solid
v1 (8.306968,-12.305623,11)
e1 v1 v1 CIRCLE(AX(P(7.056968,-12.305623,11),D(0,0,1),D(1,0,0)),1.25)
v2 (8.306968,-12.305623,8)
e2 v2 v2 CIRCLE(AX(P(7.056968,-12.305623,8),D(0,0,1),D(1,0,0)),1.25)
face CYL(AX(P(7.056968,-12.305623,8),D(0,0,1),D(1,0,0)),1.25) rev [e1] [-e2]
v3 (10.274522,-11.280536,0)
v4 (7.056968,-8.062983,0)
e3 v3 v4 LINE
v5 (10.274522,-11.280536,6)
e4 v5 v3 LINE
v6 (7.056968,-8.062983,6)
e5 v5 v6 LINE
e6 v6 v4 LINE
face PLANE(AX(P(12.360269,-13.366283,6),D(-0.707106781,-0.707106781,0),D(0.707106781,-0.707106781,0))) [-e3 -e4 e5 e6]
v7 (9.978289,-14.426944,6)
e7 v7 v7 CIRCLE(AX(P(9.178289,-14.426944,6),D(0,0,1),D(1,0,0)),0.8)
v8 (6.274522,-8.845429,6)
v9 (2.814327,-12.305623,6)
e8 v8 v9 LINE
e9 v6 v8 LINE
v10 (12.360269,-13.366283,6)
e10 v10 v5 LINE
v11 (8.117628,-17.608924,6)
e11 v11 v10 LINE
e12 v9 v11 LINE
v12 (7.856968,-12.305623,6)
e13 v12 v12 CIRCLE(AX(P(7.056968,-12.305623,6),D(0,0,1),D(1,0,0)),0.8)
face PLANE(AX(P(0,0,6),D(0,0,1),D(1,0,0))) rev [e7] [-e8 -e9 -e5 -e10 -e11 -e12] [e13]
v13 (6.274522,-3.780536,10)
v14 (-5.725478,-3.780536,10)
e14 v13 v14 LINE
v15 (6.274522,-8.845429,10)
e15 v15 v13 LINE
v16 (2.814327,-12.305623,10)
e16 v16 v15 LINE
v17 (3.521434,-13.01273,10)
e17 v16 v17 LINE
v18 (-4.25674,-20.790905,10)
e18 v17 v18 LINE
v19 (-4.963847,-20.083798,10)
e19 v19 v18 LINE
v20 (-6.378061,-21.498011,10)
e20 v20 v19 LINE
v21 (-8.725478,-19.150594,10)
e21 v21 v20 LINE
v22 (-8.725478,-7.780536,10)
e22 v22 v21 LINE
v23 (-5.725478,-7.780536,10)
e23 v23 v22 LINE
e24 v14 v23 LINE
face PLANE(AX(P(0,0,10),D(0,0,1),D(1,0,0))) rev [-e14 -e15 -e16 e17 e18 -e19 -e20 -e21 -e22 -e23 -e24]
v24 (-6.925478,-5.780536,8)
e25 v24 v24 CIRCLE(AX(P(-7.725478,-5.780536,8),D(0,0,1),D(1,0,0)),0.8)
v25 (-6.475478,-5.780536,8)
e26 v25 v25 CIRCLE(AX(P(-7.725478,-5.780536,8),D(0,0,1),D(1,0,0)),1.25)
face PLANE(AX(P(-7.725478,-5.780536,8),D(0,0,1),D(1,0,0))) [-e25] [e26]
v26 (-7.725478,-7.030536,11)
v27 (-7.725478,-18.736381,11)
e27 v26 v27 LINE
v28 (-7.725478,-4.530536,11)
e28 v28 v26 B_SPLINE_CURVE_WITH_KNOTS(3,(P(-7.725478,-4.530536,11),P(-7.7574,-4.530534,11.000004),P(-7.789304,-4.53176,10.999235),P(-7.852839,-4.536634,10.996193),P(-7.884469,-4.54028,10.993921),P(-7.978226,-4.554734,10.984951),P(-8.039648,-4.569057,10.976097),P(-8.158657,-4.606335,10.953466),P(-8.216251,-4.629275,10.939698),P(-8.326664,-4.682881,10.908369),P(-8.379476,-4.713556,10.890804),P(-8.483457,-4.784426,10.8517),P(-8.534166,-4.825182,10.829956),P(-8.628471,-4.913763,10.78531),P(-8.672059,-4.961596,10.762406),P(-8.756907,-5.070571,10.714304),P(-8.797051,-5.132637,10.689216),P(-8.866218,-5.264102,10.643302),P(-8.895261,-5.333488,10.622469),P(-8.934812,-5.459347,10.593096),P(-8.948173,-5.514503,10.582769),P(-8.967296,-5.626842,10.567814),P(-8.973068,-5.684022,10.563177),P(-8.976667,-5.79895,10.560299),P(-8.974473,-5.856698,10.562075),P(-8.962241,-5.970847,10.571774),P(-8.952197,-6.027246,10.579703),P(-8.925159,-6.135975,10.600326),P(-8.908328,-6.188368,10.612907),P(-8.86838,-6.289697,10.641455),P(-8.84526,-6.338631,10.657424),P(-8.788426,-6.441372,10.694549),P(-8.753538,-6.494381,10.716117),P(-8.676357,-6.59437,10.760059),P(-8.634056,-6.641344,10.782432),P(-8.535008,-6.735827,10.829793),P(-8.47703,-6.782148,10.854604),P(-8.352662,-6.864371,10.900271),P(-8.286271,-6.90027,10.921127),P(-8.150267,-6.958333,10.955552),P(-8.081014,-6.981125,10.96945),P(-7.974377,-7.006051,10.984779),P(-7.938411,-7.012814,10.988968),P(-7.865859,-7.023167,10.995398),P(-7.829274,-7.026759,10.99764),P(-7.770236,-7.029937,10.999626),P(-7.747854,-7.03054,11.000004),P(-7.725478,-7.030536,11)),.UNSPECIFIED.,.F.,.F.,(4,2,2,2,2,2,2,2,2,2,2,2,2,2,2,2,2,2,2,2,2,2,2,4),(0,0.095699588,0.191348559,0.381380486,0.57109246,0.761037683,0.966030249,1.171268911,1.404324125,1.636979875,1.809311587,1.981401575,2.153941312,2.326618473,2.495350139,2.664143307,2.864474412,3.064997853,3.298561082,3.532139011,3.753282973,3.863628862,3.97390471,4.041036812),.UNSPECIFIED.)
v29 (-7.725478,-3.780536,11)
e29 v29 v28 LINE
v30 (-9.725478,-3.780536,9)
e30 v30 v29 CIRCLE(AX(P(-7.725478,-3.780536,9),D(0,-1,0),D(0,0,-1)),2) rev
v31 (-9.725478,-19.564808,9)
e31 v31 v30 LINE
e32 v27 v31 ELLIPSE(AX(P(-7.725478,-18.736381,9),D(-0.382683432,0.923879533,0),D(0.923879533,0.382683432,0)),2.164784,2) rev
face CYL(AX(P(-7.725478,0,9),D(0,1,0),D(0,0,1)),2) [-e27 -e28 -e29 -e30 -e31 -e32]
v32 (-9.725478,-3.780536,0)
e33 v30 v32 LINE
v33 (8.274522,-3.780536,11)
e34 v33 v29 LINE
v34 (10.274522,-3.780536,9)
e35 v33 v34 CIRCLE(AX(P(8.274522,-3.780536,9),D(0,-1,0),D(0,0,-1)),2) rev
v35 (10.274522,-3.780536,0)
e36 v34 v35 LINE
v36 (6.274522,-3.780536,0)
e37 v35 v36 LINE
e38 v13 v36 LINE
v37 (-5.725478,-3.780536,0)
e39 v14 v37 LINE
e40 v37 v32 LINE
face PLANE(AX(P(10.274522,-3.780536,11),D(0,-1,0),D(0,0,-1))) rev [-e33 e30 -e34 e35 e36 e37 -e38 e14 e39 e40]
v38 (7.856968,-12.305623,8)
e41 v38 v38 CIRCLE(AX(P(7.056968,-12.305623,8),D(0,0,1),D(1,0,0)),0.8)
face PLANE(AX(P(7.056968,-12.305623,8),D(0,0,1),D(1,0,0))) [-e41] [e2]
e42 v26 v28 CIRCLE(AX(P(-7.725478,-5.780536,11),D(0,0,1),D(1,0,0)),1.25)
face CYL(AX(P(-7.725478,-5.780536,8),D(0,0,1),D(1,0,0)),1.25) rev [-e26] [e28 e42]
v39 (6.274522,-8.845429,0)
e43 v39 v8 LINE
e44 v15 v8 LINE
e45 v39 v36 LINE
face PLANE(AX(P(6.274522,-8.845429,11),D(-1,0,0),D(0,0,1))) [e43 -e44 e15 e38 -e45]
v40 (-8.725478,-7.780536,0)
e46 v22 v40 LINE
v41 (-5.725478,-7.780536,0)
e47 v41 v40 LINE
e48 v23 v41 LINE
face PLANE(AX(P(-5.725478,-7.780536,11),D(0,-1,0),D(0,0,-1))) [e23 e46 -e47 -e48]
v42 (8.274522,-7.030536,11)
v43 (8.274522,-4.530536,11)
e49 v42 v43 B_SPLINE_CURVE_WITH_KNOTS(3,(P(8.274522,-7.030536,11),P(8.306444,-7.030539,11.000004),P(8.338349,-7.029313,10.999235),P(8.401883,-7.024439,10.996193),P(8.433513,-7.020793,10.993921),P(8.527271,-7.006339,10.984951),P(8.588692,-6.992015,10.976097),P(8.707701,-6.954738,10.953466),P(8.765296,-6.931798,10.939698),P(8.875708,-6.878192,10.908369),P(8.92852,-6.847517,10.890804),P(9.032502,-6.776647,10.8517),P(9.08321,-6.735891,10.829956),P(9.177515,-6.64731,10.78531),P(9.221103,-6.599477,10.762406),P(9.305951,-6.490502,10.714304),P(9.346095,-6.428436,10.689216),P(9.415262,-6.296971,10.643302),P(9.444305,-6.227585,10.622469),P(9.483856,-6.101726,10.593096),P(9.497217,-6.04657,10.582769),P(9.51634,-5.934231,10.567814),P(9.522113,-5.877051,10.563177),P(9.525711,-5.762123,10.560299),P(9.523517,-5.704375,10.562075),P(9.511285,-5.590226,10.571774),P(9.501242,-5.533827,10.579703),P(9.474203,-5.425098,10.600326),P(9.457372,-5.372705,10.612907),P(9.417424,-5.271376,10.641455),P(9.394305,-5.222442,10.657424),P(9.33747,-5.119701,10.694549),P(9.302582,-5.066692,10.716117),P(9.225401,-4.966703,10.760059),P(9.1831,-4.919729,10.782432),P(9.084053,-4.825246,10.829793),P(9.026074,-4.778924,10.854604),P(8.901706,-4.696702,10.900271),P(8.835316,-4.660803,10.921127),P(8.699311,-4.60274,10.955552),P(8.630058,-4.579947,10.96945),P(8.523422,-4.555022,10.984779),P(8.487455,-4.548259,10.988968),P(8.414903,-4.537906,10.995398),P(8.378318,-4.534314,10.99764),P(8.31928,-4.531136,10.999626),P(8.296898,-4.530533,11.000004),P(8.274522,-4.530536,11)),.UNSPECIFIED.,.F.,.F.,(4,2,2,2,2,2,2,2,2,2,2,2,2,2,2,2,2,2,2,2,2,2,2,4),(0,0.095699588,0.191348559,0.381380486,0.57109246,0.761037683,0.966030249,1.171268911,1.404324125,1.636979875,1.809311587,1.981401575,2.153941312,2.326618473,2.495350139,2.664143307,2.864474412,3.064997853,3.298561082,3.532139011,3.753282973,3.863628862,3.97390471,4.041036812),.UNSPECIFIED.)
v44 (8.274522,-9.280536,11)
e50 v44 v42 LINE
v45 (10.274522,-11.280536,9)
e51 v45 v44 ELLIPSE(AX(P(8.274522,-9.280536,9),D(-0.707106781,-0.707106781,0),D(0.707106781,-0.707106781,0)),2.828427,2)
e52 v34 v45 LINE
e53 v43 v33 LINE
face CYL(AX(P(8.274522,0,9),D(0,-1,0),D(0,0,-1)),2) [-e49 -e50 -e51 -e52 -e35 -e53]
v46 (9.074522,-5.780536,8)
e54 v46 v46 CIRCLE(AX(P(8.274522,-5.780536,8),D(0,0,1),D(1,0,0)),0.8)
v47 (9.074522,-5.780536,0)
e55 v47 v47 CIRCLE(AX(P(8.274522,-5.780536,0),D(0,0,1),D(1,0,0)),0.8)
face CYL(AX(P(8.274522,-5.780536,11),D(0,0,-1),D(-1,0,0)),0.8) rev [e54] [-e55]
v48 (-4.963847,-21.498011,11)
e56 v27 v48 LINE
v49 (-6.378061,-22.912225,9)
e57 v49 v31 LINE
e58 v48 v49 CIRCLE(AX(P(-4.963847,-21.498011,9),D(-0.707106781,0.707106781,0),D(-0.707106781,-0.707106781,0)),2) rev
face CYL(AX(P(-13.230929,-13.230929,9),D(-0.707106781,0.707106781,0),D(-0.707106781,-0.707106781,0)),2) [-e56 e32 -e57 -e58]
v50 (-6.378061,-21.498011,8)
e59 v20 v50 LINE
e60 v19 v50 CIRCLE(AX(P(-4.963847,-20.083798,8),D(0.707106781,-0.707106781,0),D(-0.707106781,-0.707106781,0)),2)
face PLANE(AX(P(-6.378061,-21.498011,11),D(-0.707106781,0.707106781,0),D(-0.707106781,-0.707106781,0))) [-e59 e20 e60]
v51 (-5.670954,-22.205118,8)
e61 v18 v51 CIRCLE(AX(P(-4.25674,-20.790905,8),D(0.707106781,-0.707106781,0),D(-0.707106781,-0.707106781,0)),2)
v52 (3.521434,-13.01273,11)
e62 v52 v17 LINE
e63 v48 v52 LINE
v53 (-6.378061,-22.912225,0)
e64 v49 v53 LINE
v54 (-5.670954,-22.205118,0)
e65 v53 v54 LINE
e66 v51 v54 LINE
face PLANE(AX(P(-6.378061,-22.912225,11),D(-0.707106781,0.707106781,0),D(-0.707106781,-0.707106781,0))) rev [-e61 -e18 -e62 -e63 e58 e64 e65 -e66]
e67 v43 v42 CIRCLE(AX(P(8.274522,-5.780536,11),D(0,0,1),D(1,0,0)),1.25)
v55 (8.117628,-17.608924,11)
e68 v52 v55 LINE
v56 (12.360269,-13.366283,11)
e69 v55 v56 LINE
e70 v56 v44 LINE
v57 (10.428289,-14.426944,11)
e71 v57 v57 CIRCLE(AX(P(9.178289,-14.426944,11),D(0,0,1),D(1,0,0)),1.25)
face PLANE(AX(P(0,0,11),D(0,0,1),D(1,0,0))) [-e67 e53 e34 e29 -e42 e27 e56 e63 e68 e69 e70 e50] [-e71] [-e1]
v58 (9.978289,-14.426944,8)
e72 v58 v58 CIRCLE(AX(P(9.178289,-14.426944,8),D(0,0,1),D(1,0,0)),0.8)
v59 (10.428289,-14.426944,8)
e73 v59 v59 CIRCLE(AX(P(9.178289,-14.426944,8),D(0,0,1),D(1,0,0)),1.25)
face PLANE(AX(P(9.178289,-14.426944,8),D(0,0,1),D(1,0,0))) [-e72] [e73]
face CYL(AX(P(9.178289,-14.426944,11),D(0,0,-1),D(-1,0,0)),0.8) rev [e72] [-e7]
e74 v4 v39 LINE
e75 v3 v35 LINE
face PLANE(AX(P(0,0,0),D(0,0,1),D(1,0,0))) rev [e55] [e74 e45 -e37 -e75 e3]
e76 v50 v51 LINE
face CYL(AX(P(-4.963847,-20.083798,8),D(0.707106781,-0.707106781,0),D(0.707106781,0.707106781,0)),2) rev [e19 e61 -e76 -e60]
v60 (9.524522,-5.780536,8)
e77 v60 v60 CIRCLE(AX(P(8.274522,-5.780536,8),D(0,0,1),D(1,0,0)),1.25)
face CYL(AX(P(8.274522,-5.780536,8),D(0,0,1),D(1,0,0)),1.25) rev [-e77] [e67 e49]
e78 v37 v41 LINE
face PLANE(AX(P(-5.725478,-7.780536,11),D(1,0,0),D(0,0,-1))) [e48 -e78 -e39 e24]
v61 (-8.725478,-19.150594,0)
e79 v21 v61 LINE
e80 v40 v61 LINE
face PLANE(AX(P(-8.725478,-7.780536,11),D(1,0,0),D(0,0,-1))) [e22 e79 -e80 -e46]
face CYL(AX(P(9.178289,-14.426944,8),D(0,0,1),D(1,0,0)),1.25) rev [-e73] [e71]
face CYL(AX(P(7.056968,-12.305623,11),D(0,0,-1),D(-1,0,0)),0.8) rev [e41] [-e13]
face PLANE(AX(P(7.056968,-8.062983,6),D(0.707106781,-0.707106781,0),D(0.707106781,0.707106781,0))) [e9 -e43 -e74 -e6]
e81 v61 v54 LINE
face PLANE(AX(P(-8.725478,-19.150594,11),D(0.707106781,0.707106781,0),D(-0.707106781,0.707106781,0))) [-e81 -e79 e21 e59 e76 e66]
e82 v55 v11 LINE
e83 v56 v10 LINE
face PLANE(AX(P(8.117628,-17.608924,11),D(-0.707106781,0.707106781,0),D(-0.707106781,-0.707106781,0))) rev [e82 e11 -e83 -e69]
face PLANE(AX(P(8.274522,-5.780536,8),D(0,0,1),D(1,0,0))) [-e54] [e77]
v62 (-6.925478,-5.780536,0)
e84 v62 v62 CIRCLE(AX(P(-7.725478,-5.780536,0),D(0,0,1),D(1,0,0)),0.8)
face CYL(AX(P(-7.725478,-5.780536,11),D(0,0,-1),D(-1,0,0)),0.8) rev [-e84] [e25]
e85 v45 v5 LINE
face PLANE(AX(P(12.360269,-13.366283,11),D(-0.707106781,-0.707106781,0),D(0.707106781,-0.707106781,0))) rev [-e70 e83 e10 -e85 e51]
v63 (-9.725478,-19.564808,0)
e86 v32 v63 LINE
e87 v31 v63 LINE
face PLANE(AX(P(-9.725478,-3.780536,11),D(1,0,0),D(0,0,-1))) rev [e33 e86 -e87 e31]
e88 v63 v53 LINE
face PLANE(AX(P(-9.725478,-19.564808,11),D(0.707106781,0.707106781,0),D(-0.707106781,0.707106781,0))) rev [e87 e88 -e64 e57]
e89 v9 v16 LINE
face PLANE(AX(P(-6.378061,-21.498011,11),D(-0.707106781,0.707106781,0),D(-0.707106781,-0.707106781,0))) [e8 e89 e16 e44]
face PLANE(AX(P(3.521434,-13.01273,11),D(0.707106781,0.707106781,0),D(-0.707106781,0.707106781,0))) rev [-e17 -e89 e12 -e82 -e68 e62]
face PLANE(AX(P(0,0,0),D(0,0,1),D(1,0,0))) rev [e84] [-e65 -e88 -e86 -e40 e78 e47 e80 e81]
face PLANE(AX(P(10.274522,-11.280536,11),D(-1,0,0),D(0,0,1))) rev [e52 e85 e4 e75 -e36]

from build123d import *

# Parameters (mm, degrees)
BOSS_EXTRUDE1_DEPTH      = 11
BOSS_EXTRUDE2_START      = 11
BOSS_EXTRUDE2_DEPTH      = 1
SKETCH6_W                = 12
SKETCH6_H                = 1
UPPER_TUBE_OPENING_DEPTH = 10
LOWER_TUBE_OPENING_DEPTH = 1
SKETCH4_R                = 0.800000001
SKETCH4_R_2              = 0.800000002
SCREW_HOLES_DEPTH        = 29.262100116
SCREW_START              = 11
SKETCH5_R                = 1.25
SCREW_HEADS_DEPTH        = 3
FILLET1_R                = 2
CUT_EXTRUDE1_DEPTH       = 6


with BuildPart() as part:
    # Sketch2 → Boss-Extrude1 (new body)
    with BuildSketch(Plane.XY):
        Polygon((-6.378060684, -22.912224964), (3.521434253, -13.012730028), (8.11762833, -17.608924106), (12.360269017, -13.366283419), (10.274522062, -11.280536464), (10.274522062, -3.780536464), (-9.725477938, -3.780536464), (-9.725477938, -19.56480771), align=None)
        Polygon((-5.725477938, -7.780536464), (-5.725477938, -4.780536464), (6.274522063, -4.780536464), (6.274522063, -8.845428655), (-6.378060684, -21.498011402), (-8.725477938, -19.150594148), (-8.725477938, -7.780536464), align=None, mode=Mode.SUBTRACT)
    extrude(amount=BOSS_EXTRUDE1_DEPTH)

    # Sketch3 → Boss-Extrude2 (add)
    with BuildSketch(Plane.XY.offset(BOSS_EXTRUDE2_START)):
        Polygon((-6.378060684, -22.912224964), (3.521434253, -13.012730028), (8.11762833, -17.608924106), (12.360269017, -13.366283419), (10.274522062, -11.280536464), (10.274522062, -3.780536464), (-9.725477938, -3.780536464), (-9.725477938, -19.56480771), align=None)
    extrude(amount=-BOSS_EXTRUDE2_DEPTH)

    # Sketch6 → Upper Tube Opening (cut)
    with BuildSketch(Plane.XY):
        with Locations((0.274522062, -4.280536464)):
            Rectangle(SKETCH6_W, SKETCH6_H)
    extrude(amount=UPPER_TUBE_OPENING_DEPTH, mode=Mode.SUBTRACT)

    # Sketch7 → Lower Tube Opening (cut)
    with BuildSketch(Plane(origin=(8.26708214, -8.26708214, 0), x_dir=(0, 0, -1), z_dir=(0.7071067811865477, -0.7071067811865475, 0))):
        with BuildLine():
            Line((-8, -19.711359605), (0, -19.711359605))
            Line((0, -19.711359605), (0, -6.711359605))
            Line((0, -6.711359605), (-10, -6.711359605))
            Line((-10, -6.711359605), (-10, -17.711359605))
            ThreePointArc((-10, -17.711359605), (-9.414213562, -19.125573167), (-8, -19.711359605))
        make_face()
    extrude(amount=-LOWER_TUBE_OPENING_DEPTH, mode=Mode.SUBTRACT)

    # Sketch4 → Screw Holes (cut, through all)
    with BuildSketch(Plane.XY):
        with Locations((9.178288502, -14.426943591)):
            Circle(SKETCH4_R)
        with Locations((7.056968158, -12.305623247)):
            Circle(SKETCH4_R)
        with Locations((-7.725477938, -5.780536464)):
            Circle(SKETCH4_R_2)
        with Locations((8.274522062, -5.780536464)):
            Circle(SKETCH4_R_2)
    extrude(amount=SCREW_HOLES_DEPTH, mode=Mode.SUBTRACT)

    # Sketch5 → Screw Heads (cut)
    with BuildSketch(Plane.XY.offset(SCREW_START)):
        with Locations((-7.725477938, -5.780536464)):
            Circle(SKETCH5_R)
        with Locations((8.274522062, -5.780536464)):
            Circle(SKETCH5_R)
        with Locations((7.056968158, -12.305623247)):
            Circle(SKETCH5_R)
        with Locations((9.178288502, -14.426943591)):
            Circle(SKETCH5_R)
    extrude(amount=-SCREW_HEADS_DEPTH, mode=Mode.SUBTRACT)

    # Fillet1
    # the kernel refuses this fillet: 2 mm, written as the material it takes off along each edge
    with BuildSketch(Plane(origin=(10.274522062, -16.280536464, 11), x_dir=(-1, 0, 0), z_dir=(0, 1, 0))) as fillet1_piece_1_section:
        with BuildLine():
            CenterArc((FILLET1_R, -FILLET1_R), FILLET1_R, 90, 90)
            Line((0, -FILLET1_R), (0, 0))
            Line((0, 0), (FILLET1_R, 0))
        make_face()
    fillet1_piece_1 = extrude(amount=17.5, mode=Mode.PRIVATE)
    fillet1_piece_1 = split(fillet1_piece_1, bisect_by=Plane(origin=(6.821503017, -7.82751742, 10.5380934), z_dir=(0.707106781186547, 0.7071067811865481, 0)), keep=Keep.TOP, mode=Mode.PRIVATE)
    add(fillet1_piece_1, mode=Mode.SUBTRACT)
    with BuildSketch(Plane(origin=(-9.725477938, 1.219463536, 11), x_dir=(1, 0, 0), z_dir=(0, -1, 0))) as fillet1_piece_2:
        with BuildLine():
            CenterArc((FILLET1_R, -FILLET1_R), FILLET1_R, 90, 90)
            Line((0, -FILLET1_R), (0, 0))
            Line((0, 0), (FILLET1_R, 0))
        make_face()
    extrude(amount=25.784271246, mode=Mode.SUBTRACT)
    with BuildSketch(Plane(origin=(-13.261011844, -16.029273804, 11), x_dir=(0.7071067811865474, 0.7071067811865478, 0), z_dir=(0.7071067811865478, -0.7071067811865474, 0))) as fillet1_piece_3:
        with BuildLine():
            CenterArc((FILLET1_R, -FILLET1_R), FILLET1_R, 90, 90)
            Line((0, -FILLET1_R), (0, 0))
            Line((0, 0), (FILLET1_R, 0))
        make_face()
    extrude(amount=14.73396288, mode=Mode.SUBTRACT)

    # Sketch10 → Cut-Extrude1 (cut)
    with BuildSketch(Plane.XY):
        Polygon((12.360269017, -13.366283419), (8.11762833, -17.608924106), (2.814327472, -12.305623247), (7.056968158, -8.06298256), align=None)
    extrude(amount=CUT_EXTRUDE1_DEPTH, mode=Mode.SUBTRACT)


solid = part.part
